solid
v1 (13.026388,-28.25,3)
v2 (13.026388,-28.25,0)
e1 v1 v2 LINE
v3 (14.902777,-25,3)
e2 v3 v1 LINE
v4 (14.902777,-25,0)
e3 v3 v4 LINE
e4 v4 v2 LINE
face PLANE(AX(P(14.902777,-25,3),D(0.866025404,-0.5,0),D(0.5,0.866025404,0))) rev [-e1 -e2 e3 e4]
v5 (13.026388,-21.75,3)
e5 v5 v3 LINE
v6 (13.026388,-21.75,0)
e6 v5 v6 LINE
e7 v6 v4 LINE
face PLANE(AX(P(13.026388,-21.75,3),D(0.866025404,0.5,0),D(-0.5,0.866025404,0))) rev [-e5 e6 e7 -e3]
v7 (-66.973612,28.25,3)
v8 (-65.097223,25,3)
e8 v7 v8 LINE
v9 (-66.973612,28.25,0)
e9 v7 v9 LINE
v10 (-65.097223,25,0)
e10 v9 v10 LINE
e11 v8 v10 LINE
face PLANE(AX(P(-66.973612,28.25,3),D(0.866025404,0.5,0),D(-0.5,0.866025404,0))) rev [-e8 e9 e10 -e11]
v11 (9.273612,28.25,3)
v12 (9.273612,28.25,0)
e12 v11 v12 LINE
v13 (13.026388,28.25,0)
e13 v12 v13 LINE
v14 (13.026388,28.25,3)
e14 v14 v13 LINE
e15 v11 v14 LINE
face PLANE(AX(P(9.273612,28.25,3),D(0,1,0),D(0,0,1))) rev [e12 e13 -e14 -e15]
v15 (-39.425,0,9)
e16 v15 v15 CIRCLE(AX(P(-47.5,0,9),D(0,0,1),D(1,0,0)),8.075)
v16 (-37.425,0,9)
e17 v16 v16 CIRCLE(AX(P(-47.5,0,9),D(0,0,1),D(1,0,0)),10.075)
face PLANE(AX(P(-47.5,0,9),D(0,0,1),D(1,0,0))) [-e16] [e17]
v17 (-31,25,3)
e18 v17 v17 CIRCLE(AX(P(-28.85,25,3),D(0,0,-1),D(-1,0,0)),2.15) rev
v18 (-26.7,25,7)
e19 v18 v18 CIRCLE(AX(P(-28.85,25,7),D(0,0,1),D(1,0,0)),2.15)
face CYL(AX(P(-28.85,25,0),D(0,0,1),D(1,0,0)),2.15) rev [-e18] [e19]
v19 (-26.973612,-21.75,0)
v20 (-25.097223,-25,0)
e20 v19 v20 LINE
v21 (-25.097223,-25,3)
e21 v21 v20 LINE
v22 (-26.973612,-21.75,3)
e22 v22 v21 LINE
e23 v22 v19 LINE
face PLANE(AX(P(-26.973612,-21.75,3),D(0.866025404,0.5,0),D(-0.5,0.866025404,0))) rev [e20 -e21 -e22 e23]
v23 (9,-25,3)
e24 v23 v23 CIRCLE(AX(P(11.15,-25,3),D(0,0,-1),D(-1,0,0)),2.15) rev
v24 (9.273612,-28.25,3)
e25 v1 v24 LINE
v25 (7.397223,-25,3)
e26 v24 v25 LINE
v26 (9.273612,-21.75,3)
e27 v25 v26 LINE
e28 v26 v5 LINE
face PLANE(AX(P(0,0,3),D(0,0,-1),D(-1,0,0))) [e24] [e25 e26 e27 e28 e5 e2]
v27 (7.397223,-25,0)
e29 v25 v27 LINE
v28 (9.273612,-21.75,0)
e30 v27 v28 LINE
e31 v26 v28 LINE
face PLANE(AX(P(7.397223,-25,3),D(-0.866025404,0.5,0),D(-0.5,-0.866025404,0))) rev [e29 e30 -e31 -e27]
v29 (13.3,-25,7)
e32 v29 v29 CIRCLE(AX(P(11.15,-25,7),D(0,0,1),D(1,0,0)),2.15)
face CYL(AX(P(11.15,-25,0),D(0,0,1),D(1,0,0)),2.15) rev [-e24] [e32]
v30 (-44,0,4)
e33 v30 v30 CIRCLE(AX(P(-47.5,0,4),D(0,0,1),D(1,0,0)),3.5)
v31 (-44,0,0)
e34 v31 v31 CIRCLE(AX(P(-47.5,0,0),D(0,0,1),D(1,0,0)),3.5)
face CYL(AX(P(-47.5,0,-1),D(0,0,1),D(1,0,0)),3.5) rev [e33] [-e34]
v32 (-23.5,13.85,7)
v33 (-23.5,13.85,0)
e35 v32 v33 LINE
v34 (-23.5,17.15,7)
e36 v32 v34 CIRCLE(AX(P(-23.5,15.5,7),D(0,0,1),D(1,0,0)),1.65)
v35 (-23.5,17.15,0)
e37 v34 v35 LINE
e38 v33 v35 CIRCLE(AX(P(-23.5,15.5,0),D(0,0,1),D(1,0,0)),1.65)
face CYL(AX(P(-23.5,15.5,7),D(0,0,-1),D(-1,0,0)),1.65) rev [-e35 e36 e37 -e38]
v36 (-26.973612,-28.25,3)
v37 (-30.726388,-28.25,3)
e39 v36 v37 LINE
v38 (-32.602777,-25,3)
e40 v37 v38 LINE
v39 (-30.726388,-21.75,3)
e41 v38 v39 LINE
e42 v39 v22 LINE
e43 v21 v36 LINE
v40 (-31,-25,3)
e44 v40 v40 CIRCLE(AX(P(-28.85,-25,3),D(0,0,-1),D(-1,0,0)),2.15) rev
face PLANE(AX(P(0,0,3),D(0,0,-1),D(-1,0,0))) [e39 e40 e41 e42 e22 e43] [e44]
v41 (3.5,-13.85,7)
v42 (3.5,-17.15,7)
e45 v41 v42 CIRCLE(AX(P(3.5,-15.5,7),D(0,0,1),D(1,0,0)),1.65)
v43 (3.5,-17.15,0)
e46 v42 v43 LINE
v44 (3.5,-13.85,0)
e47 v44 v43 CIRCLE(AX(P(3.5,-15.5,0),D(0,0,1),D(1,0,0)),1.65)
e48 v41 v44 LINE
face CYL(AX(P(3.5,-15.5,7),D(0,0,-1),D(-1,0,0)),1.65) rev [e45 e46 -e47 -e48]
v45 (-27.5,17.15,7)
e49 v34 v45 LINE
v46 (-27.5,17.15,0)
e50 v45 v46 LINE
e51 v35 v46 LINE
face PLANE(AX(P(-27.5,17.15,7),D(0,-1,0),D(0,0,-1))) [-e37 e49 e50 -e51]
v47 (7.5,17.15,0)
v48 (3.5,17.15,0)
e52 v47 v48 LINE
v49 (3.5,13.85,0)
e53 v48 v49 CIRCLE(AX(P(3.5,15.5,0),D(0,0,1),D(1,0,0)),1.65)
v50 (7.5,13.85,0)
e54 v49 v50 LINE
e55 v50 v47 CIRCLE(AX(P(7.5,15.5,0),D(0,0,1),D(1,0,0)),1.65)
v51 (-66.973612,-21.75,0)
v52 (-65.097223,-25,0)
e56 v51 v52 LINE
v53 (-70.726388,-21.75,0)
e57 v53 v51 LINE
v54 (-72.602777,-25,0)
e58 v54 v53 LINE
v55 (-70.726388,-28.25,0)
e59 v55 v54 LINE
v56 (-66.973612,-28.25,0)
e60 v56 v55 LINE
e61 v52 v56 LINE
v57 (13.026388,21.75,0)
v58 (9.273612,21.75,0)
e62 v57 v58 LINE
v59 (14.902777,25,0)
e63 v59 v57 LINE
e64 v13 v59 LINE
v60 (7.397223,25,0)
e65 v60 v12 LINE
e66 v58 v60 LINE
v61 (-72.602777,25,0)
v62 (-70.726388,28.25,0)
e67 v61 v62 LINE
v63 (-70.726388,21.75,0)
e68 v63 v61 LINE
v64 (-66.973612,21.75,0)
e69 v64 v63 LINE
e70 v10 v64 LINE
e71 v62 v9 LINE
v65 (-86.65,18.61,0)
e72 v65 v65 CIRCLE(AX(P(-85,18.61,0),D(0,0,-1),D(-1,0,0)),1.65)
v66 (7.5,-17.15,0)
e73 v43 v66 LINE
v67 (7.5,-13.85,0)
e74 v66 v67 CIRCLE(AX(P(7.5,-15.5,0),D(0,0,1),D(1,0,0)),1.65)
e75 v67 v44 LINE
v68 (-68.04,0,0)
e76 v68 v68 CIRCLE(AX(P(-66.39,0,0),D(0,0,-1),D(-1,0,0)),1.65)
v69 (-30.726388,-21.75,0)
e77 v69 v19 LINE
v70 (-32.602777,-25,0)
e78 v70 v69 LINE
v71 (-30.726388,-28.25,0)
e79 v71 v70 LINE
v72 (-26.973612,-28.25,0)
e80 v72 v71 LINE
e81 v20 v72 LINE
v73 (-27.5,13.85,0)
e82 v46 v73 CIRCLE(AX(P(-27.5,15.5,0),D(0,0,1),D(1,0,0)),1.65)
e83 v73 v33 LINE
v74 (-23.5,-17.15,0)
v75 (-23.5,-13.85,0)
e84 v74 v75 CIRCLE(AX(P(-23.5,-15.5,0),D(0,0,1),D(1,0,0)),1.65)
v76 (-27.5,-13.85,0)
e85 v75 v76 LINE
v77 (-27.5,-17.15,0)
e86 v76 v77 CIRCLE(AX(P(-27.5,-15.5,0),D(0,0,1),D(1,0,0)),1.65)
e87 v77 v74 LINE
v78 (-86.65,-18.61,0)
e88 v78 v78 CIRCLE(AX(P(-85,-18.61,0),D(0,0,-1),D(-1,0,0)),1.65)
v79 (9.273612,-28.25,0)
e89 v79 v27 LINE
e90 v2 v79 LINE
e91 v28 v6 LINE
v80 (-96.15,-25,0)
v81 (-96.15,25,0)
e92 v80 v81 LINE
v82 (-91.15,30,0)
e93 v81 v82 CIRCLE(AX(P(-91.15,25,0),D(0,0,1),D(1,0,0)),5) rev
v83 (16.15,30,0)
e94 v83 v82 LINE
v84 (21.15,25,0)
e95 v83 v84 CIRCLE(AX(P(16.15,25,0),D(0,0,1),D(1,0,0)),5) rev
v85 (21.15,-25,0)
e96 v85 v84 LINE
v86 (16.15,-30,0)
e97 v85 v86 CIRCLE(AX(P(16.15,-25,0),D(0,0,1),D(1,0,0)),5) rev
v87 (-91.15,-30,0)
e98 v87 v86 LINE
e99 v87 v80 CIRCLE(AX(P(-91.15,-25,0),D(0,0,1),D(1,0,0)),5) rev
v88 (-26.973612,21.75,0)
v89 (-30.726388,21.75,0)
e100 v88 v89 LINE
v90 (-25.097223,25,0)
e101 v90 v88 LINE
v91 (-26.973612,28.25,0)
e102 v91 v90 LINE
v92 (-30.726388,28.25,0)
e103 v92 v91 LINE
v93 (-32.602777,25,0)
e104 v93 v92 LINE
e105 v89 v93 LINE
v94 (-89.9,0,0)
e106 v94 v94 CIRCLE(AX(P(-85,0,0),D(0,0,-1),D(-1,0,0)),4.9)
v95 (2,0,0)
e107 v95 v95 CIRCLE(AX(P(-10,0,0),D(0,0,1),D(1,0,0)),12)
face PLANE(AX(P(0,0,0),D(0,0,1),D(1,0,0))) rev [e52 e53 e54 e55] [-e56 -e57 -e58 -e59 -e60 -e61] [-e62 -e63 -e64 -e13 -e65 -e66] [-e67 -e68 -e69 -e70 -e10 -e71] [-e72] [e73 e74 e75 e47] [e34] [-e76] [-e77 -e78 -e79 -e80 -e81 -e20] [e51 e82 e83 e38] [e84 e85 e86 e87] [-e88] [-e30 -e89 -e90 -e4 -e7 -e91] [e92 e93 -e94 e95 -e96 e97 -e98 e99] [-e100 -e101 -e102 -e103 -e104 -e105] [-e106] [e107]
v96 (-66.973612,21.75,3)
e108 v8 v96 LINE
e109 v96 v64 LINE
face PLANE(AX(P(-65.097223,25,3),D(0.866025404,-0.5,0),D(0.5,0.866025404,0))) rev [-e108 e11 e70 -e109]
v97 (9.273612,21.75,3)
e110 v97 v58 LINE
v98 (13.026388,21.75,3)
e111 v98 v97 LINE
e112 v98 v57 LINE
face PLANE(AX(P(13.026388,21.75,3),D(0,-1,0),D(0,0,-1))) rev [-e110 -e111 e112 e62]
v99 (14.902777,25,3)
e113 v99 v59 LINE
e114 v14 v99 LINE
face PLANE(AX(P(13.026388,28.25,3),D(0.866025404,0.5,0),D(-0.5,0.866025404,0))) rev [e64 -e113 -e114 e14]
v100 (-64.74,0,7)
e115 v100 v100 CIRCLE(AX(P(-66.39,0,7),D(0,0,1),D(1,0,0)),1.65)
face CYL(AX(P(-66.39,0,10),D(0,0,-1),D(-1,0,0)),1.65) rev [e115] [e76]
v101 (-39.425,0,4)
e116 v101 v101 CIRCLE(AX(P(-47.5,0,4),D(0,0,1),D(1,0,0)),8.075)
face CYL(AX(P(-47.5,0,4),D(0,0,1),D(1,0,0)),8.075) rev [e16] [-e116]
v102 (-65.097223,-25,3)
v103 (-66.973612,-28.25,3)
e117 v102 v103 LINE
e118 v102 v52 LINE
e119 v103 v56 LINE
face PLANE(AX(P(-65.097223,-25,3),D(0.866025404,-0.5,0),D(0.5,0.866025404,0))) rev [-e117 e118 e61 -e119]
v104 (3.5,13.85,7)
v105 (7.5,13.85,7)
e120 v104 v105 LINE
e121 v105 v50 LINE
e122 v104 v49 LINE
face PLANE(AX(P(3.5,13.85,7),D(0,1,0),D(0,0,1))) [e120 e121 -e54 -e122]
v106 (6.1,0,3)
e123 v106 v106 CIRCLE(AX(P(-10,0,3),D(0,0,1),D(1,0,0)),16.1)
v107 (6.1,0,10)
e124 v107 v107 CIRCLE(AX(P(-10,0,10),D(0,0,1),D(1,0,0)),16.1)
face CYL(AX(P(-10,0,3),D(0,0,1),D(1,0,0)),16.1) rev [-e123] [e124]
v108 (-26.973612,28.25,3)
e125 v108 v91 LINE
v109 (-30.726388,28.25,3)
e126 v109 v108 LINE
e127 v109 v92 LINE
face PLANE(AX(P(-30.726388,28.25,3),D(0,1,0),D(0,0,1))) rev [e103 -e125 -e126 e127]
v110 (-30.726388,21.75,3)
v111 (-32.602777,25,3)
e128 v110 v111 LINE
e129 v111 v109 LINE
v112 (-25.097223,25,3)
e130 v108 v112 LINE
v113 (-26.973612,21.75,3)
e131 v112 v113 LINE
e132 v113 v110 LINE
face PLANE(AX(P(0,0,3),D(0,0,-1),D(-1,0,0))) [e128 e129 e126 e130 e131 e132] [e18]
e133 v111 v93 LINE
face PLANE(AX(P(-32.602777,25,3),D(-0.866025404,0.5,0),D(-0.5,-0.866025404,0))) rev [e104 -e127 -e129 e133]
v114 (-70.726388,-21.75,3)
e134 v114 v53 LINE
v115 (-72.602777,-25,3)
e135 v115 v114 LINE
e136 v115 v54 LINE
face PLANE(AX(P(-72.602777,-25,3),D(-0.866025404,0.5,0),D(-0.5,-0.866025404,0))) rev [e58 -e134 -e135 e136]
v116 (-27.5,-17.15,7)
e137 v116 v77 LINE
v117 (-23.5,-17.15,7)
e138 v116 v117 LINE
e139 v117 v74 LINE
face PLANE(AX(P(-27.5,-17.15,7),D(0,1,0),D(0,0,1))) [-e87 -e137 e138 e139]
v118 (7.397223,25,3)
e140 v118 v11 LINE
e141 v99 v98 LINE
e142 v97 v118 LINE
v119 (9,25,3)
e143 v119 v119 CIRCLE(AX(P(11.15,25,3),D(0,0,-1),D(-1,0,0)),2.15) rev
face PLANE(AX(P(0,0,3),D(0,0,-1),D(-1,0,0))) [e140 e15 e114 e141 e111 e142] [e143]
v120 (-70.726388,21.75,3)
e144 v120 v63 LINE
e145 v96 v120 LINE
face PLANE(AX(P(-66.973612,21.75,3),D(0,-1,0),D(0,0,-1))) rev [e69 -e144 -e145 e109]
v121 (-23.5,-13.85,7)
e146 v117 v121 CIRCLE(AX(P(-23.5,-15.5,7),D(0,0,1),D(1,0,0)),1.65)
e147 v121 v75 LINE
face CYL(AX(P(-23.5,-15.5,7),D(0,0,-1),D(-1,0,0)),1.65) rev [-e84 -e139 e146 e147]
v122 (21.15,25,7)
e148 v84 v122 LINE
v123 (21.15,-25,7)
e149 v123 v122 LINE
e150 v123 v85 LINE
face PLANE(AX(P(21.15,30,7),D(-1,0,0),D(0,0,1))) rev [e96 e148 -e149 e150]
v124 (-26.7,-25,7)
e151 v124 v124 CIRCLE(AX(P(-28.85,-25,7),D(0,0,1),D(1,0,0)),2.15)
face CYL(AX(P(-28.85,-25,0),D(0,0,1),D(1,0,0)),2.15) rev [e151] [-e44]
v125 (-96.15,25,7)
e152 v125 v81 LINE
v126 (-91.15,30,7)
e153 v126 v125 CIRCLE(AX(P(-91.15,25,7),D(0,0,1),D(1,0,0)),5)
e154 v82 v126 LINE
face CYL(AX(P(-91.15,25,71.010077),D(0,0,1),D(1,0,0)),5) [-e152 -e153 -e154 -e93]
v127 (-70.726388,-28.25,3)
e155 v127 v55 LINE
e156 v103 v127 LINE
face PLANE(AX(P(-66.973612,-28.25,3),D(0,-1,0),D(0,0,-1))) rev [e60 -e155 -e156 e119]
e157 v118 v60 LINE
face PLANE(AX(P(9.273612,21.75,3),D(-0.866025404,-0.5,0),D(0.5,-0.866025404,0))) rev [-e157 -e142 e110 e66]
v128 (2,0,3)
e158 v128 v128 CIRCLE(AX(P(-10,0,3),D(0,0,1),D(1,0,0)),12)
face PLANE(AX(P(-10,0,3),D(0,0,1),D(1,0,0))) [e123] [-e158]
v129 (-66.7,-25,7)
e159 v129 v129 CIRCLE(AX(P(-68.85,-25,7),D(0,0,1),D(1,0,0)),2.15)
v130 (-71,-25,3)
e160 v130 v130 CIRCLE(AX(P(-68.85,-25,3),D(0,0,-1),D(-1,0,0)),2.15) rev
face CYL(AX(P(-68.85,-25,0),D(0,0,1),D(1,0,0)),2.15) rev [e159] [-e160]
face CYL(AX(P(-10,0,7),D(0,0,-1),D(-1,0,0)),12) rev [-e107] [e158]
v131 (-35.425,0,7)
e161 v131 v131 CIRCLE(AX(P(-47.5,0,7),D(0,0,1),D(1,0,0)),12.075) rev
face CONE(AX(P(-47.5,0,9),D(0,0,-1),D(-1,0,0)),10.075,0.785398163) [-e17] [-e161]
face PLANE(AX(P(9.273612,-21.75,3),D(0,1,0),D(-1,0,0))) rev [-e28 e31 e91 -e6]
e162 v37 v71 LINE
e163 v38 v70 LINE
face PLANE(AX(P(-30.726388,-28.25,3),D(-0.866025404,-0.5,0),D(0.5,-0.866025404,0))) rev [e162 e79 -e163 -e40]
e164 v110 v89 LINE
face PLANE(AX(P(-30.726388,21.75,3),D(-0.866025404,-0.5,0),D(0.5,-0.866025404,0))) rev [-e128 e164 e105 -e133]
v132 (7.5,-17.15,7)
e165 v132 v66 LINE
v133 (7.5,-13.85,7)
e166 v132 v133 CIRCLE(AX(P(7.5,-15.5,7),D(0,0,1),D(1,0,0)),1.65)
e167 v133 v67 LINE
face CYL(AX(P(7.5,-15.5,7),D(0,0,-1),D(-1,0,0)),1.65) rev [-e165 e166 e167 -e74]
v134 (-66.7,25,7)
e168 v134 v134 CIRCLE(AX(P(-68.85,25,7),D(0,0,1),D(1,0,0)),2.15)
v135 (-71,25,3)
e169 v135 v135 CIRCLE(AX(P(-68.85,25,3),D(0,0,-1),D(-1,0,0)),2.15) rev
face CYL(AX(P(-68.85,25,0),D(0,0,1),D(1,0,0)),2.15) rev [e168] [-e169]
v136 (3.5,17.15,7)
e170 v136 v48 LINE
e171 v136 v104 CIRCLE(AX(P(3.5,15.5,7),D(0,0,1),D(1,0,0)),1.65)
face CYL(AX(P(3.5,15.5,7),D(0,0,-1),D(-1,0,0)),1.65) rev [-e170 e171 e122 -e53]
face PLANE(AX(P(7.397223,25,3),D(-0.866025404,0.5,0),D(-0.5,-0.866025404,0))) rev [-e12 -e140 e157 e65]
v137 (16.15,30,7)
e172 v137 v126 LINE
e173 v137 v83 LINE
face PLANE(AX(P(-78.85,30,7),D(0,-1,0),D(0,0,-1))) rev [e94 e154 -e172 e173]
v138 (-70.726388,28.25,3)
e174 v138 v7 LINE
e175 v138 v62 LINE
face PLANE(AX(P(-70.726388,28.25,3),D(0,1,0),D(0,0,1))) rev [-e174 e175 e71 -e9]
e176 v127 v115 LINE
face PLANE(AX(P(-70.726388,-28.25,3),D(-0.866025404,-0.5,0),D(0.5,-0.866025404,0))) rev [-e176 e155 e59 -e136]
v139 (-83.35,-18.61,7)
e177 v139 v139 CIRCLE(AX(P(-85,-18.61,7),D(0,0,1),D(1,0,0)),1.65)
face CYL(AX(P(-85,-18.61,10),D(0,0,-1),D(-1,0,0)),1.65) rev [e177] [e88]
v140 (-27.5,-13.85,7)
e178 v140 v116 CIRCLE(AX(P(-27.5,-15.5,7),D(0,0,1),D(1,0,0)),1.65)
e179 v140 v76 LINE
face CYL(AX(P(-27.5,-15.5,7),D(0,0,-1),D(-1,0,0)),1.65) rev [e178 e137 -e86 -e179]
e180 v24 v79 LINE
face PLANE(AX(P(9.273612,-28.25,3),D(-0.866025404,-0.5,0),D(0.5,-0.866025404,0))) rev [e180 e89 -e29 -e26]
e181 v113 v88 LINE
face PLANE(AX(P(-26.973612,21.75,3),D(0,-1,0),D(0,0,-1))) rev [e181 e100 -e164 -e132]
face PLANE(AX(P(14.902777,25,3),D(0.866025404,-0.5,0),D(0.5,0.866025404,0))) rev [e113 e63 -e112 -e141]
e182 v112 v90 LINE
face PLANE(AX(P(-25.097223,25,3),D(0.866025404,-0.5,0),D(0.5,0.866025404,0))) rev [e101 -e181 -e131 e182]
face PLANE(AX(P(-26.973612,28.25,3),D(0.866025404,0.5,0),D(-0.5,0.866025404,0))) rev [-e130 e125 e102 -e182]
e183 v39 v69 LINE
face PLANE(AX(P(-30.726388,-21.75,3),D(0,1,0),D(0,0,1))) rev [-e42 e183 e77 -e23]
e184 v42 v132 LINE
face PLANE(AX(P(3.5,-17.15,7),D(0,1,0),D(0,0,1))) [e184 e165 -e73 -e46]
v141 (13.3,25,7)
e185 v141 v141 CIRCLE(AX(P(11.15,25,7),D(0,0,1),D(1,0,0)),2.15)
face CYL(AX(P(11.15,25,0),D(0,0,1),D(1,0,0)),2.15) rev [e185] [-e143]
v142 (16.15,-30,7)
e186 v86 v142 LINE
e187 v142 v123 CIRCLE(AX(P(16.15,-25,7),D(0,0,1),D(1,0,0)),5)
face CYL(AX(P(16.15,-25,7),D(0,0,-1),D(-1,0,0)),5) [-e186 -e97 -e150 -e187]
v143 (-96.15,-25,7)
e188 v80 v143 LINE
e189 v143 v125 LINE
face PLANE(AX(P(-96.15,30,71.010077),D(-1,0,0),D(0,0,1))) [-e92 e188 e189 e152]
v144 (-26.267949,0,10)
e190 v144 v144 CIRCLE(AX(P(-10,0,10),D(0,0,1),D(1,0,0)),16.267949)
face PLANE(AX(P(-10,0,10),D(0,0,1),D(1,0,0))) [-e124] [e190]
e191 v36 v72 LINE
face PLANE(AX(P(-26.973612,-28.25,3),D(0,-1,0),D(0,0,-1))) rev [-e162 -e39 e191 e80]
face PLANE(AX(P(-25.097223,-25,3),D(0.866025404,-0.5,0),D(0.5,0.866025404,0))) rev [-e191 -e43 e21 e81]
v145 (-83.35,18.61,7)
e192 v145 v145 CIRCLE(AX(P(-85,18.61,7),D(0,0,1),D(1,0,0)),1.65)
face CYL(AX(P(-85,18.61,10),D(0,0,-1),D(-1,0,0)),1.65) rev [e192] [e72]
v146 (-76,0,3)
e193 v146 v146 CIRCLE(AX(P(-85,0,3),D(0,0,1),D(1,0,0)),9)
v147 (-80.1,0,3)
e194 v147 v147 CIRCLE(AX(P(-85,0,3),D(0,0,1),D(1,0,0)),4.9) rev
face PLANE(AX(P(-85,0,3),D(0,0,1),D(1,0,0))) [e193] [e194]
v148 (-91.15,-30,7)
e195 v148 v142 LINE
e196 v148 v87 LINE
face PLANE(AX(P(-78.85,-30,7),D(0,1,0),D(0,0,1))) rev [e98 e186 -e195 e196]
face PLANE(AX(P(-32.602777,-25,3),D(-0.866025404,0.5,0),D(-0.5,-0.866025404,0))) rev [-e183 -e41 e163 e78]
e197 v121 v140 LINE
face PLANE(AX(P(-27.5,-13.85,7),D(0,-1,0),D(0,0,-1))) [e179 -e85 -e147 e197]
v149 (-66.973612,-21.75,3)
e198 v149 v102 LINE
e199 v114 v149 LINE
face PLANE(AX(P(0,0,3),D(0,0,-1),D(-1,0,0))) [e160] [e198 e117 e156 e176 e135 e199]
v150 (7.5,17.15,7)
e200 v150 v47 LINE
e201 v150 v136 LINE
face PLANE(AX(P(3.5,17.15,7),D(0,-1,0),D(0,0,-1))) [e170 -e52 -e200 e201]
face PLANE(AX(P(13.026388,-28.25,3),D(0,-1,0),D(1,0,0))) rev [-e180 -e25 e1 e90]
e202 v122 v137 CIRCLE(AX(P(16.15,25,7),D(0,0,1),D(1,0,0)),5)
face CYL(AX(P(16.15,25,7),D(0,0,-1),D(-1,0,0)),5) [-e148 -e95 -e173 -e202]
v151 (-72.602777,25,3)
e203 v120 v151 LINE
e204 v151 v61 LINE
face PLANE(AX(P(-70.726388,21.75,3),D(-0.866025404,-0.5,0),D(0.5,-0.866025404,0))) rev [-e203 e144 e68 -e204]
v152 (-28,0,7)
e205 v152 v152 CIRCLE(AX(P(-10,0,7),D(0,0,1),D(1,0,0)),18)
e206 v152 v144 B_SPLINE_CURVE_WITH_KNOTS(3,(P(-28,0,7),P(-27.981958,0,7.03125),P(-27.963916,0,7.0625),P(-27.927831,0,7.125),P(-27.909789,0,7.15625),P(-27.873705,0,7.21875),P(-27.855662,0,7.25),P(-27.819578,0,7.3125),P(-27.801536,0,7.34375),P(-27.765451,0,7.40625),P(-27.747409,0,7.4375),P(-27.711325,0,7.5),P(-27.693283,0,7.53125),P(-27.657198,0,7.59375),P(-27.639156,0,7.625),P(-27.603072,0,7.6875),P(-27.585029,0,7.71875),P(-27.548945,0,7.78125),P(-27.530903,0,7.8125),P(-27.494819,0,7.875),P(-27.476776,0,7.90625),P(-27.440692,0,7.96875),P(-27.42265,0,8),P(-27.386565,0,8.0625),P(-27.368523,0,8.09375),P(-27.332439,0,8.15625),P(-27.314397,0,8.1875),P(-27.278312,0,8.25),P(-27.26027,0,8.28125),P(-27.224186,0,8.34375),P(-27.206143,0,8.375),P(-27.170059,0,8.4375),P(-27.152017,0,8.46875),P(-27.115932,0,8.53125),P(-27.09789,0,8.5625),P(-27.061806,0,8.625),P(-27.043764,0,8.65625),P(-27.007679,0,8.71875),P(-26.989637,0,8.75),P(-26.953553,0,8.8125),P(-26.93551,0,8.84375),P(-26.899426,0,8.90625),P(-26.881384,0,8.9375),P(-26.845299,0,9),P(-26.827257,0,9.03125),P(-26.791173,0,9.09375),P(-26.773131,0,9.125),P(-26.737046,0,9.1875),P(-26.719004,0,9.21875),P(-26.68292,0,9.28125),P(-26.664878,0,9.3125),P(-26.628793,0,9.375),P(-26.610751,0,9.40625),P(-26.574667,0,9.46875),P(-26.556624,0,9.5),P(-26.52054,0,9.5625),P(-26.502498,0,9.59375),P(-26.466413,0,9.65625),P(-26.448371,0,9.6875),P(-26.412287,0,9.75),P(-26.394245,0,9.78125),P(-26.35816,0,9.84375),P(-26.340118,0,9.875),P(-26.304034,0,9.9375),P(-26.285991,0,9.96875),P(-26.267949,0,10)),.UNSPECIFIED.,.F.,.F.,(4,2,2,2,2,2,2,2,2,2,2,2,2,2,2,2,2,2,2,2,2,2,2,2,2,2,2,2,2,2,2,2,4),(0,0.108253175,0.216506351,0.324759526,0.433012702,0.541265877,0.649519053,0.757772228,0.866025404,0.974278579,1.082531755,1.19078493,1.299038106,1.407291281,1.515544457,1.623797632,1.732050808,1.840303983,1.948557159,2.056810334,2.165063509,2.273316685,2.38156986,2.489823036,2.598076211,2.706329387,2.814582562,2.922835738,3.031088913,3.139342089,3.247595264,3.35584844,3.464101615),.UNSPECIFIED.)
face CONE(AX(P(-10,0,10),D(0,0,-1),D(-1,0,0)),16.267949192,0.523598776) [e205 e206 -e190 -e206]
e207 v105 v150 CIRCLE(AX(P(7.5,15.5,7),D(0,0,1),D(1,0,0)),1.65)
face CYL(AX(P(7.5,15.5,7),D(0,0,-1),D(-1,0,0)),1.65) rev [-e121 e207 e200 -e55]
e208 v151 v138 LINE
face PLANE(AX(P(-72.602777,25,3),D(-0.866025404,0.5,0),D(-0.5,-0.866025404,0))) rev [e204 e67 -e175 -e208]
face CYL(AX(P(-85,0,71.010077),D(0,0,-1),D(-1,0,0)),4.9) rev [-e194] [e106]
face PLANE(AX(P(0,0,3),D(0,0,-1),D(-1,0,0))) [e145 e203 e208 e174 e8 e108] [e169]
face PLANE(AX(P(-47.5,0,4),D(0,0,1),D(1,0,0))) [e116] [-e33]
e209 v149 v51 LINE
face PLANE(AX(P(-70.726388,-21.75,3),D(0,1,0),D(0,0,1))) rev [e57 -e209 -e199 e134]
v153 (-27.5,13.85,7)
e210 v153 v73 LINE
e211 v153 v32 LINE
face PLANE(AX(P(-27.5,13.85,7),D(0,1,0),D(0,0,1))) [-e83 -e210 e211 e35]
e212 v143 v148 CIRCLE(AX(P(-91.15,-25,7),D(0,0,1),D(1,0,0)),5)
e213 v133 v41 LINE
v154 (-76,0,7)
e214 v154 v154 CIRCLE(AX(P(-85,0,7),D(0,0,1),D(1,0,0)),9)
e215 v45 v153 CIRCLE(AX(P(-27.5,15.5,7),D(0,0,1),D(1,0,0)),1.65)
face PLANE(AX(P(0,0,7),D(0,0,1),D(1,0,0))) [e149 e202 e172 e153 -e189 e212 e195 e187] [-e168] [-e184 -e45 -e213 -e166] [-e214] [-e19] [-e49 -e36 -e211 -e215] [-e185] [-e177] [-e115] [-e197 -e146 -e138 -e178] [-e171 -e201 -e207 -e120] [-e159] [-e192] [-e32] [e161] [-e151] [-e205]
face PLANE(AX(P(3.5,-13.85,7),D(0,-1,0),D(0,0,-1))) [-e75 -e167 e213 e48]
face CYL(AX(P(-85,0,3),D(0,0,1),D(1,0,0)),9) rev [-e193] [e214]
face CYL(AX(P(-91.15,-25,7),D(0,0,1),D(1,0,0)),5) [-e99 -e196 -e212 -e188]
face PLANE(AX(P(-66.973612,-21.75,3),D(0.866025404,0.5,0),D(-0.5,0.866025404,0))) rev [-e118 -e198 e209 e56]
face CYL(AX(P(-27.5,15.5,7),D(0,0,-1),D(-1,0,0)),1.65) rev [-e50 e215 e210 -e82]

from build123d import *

# Parameters (mm, degrees)
SKETCH1_W           = 100
SKETCH1_H           = 60
SKETCH1_R           = 12
BOSS_EXTRUDE1_DEPTH = 7
SKETCH4_R           = 8.075
CUT_EXTRUDE1_DEPTH  = 3
SKETCH5_R           = 3.5
CUT_EXTRUDE2_DEPTH  = 5
EXTRUDE_THIN1_START = 2
SKETCH6_R           = 10.075
SKETCH6_R_2         = 8.075
EXTRUDE_THIN1_DEPTH = 2
CHAMFER1_SIZE       = 2
SKETCH7_R           = 2.15
CUT_EXTRUDE3_DEPTH  = 85.654134571
FILLET1_R           = 5
CUT_EXTRUDE4_DEPTH  = 3
SKETCH9_R           = 16.1
CUT_EXTRUDE5_DEPTH  = 4
BOSS_EXTRUDE2_START = 3
SKETCH10_R          = 18
SKETCH10_R_2        = 16.1
BOSS_EXTRUDE2_DEPTH = 3
CHAMFER2_SIZE2      = 3
CHAMFER2_SIZE       = 1.732050808
SKETCH11_W          = 22.3
SKETCH11_H          = 60
SKETCH11_R          = 4.9
BOSS_EXTRUDE3_DEPTH = 7
FILLET2_R           = 5
SKETCH12_R          = 9
CUT_EXTRUDE6_DEPTH  = 4
SKETCH15_R          = 1.65
CUT_EXTRUDE7_DEPTH  = 10


with BuildPart() as part:
    # Sketch1 → Boss-Extrude1 (new body)
    with BuildSketch(Plane.XY):
        with Locations((-28.85, 0)):
            Rectangle(SKETCH1_W, SKETCH1_H)
        with Locations((-10, 0)):
            Circle(SKETCH1_R, mode=Mode.SUBTRACT)
        with BuildLine():
            Line((3.5, 13.85), (7.5, 13.85))
            ThreePointArc((7.5, 13.85), (9.15, 15.5), (7.5, 17.15))
            Line((7.5, 17.15), (3.5, 17.15))
            ThreePointArc((3.5, 17.15), (1.85, 15.5), (3.5, 13.85))
        make_face(mode=Mode.SUBTRACT)
        with BuildLine():
            Line((-27.5, 17.15), (-23.5, 17.15))
            ThreePointArc((-23.5, 17.15), (-21.85, 15.5), (-23.5, 13.85))
            Line((-23.5, 13.85), (-27.5, 13.85))
            ThreePointArc((-27.5, 13.85), (-29.15, 15.5), (-27.5, 17.15))
        make_face(mode=Mode.SUBTRACT)
        with BuildLine():
            Line((3.5, -17.15), (7.5, -17.15))
            ThreePointArc((7.5, -17.15), (9.15, -15.5), (7.5, -13.85))
            Line((7.5, -13.85), (3.5, -13.85))
            ThreePointArc((3.5, -13.85), (1.85, -15.5), (3.5, -17.15))
        make_face(mode=Mode.SUBTRACT)
        with BuildLine():
            Line((-27.5, -17.15), (-23.5, -17.15))
            ThreePointArc((-23.5, -17.15), (-21.85, -15.5), (-23.5, -13.85))
            Line((-23.5, -13.85), (-27.5, -13.85))
            ThreePointArc((-27.5, -13.85), (-29.15, -15.5), (-27.5, -17.15))
        make_face(mode=Mode.SUBTRACT)
    extrude(amount=BOSS_EXTRUDE1_DEPTH)

    # Sketch4 → Cut-Extrude1 (cut)
    with BuildSketch(Plane.XY.offset(7)):
        with Locations((-47.5, 0)):
            Circle(SKETCH4_R)
    extrude(amount=-CUT_EXTRUDE1_DEPTH, mode=Mode.SUBTRACT)

    # Sketch5 → Cut-Extrude2 (cut)
    with BuildSketch(Plane.XY.offset(4)):
        with Locations((-47.5, 0)):
            Circle(SKETCH5_R)
    extrude(amount=-CUT_EXTRUDE2_DEPTH, mode=Mode.SUBTRACT)

    # Sketch6 → Extrude-Thin1 (add)
    with BuildSketch(Plane.XY.offset(7).offset(EXTRUDE_THIN1_START)):
        with Locations((-47.5, 0)):
            Circle(SKETCH6_R)
        with Locations((-47.5, 0)):
            Circle(SKETCH6_R_2, mode=Mode.SUBTRACT)
    extrude(amount=-EXTRUDE_THIN1_DEPTH)

    # Chamfer1
    chamfer1_edges = [part.edges().sort_by_distance(p)[0] for p in [
        (-57.575, 0, 7),
    ]]
    chamfer(chamfer1_edges, length=CHAMFER1_SIZE - 0.0001)  # a hair under: the kernel refuses the full size

    # Sketch7 → Cut-Extrude3 (cut, through all)
    with BuildSketch(Plane.XY.offset(7)):
        with Locations((-68.85, 25)):
            Circle(SKETCH7_R)
        with Locations((-28.85, 25)):
            Circle(SKETCH7_R)
        with Locations((11.15, 25)):
            Circle(SKETCH7_R)
        with Locations((11.15, -25)):
            Circle(SKETCH7_R)
        with Locations((-28.85, -25)):
            Circle(SKETCH7_R)
        with Locations((-68.85, -25)):
            Circle(SKETCH7_R)
    extrude(amount=-CUT_EXTRUDE3_DEPTH, mode=Mode.SUBTRACT)

    # Fillet1
    fillet1_edges = [part.edges().sort_by_distance(p)[0] for p in [
        (21.15, -30, 3.5),
        (-78.85, -30, 3.5),
        (-78.85, 30, 3.5),
        (21.15, 30, 3.5),
    ]]
    fillet(fillet1_edges, radius=FILLET1_R)

    # Sketch8 → Cut-Extrude4 (cut)
    with BuildSketch(Plane(origin=(0, 0, 0), x_dir=(-1, 0, 0), z_dir=(0, 0, -1))):
        Polygon((-9.273611625, 28.25), (-13.026388375, 28.25), (-14.90277675, 25), (-13.026388375, 21.75), (-9.273611625, 21.75), (-7.39722325, 25), align=None)
        Polygon((26.973611625, 21.75), (30.726388375, 21.75), (32.60277675, 25), (30.726388375, 28.25), (26.973611625, 28.25), (25.09722325, 25), align=None)
        Polygon((70.726388375, 21.75), (72.60277675, 25), (70.726388375, 28.25), (66.973611625, 28.25), (65.09722325, 25), (66.973611625, 21.75), align=None)
        Polygon((66.973611625, -28.25), (70.726388375, -28.25), (72.60277675, -25), (70.726388375, -21.75), (66.973611625, -21.75), (65.09722325, -25), align=None)
        Polygon((32.60277675, -25), (30.726388375, -21.75), (26.973611625, -21.75), (25.09722325, -25), (26.973611625, -28.25), (30.726388375, -28.25), align=None)
        Polygon((-7.39722325, -25), (-9.273611625, -21.75), (-13.026388375, -21.75), (-14.90277675, -25), (-13.026388375, -28.25), (-9.273611625, -28.25), align=None)
    extrude(amount=-CUT_EXTRUDE4_DEPTH, mode=Mode.SUBTRACT)

    # Sketch9 → Cut-Extrude5 (cut)
    with BuildSketch(Plane.XY.offset(7)):
        with Locations((-10, 0)):
            Circle(SKETCH9_R)
    extrude(amount=-CUT_EXTRUDE5_DEPTH, mode=Mode.SUBTRACT)

    # Sketch10 → Boss-Extrude2 (add)
    with BuildSketch(Plane.XY.offset(7).offset(BOSS_EXTRUDE2_START)):
        with Locations((-10, 0)):
            Circle(SKETCH10_R)
        with Locations((-10, 0)):
            Circle(SKETCH10_R_2, mode=Mode.SUBTRACT)
    extrude(amount=-BOSS_EXTRUDE2_DEPTH)

    # Chamfer2
    chamfer2_edges = [part.edges().sort_by_distance(p)[0] for p in [
        (-28, 0, 10),
    ]]
    chamfer2_side = [part.faces().sort_by_distance(p)[0] for p in [
        (-27.965358984, 0, 10),
    ]]
    chamfer(chamfer2_edges, length=CHAMFER2_SIZE - 0.0001, length2=CHAMFER2_SIZE2 - 0.0001, reference=chamfer2_side[0])  # a hair under: the kernel refuses the full size

    # Sketch11 → Boss-Extrude3 (add)
    with BuildSketch(Plane(origin=(0, 0, 0), x_dir=(-1, 0, 0), z_dir=(0, 0, -1))):
        with Locations((85, 0)):
            Rectangle(SKETCH11_W, SKETCH11_H)
        with Locations((85, 0)):
            Circle(SKETCH11_R, mode=Mode.SUBTRACT)
    extrude(amount=-BOSS_EXTRUDE3_DEPTH)

    # Fillet2
    fillet2_edges = [part.edges().sort_by_distance(p)[0] for p in [
        (-96.15, 30, 3.5),
        (-96.15, -30, 3.5),
    ]]
    fillet(fillet2_edges, radius=FILLET2_R)

    # Sketch12 → Cut-Extrude6 (cut)
    with BuildSketch(Plane.XY.offset(7)):
        with Locations((-85, 0)):
            Circle(SKETCH12_R)
    extrude(amount=-CUT_EXTRUDE6_DEPTH, mode=Mode.SUBTRACT)

    # Sketch15 → Cut-Extrude7 (cut)
    with BuildSketch(Plane(origin=(0, 0, 0), x_dir=(-1, 0, 0), z_dir=(0, 0, -1))):
        with Locations((85, 18.61)):
            Circle(SKETCH15_R)
        with Locations((85, -18.61)):
            Circle(SKETCH15_R)
        with Locations((66.39, 0)):
            Circle(SKETCH15_R)
    extrude(amount=-CUT_EXTRUDE7_DEPTH, mode=Mode.SUBTRACT)


solid = part.part
